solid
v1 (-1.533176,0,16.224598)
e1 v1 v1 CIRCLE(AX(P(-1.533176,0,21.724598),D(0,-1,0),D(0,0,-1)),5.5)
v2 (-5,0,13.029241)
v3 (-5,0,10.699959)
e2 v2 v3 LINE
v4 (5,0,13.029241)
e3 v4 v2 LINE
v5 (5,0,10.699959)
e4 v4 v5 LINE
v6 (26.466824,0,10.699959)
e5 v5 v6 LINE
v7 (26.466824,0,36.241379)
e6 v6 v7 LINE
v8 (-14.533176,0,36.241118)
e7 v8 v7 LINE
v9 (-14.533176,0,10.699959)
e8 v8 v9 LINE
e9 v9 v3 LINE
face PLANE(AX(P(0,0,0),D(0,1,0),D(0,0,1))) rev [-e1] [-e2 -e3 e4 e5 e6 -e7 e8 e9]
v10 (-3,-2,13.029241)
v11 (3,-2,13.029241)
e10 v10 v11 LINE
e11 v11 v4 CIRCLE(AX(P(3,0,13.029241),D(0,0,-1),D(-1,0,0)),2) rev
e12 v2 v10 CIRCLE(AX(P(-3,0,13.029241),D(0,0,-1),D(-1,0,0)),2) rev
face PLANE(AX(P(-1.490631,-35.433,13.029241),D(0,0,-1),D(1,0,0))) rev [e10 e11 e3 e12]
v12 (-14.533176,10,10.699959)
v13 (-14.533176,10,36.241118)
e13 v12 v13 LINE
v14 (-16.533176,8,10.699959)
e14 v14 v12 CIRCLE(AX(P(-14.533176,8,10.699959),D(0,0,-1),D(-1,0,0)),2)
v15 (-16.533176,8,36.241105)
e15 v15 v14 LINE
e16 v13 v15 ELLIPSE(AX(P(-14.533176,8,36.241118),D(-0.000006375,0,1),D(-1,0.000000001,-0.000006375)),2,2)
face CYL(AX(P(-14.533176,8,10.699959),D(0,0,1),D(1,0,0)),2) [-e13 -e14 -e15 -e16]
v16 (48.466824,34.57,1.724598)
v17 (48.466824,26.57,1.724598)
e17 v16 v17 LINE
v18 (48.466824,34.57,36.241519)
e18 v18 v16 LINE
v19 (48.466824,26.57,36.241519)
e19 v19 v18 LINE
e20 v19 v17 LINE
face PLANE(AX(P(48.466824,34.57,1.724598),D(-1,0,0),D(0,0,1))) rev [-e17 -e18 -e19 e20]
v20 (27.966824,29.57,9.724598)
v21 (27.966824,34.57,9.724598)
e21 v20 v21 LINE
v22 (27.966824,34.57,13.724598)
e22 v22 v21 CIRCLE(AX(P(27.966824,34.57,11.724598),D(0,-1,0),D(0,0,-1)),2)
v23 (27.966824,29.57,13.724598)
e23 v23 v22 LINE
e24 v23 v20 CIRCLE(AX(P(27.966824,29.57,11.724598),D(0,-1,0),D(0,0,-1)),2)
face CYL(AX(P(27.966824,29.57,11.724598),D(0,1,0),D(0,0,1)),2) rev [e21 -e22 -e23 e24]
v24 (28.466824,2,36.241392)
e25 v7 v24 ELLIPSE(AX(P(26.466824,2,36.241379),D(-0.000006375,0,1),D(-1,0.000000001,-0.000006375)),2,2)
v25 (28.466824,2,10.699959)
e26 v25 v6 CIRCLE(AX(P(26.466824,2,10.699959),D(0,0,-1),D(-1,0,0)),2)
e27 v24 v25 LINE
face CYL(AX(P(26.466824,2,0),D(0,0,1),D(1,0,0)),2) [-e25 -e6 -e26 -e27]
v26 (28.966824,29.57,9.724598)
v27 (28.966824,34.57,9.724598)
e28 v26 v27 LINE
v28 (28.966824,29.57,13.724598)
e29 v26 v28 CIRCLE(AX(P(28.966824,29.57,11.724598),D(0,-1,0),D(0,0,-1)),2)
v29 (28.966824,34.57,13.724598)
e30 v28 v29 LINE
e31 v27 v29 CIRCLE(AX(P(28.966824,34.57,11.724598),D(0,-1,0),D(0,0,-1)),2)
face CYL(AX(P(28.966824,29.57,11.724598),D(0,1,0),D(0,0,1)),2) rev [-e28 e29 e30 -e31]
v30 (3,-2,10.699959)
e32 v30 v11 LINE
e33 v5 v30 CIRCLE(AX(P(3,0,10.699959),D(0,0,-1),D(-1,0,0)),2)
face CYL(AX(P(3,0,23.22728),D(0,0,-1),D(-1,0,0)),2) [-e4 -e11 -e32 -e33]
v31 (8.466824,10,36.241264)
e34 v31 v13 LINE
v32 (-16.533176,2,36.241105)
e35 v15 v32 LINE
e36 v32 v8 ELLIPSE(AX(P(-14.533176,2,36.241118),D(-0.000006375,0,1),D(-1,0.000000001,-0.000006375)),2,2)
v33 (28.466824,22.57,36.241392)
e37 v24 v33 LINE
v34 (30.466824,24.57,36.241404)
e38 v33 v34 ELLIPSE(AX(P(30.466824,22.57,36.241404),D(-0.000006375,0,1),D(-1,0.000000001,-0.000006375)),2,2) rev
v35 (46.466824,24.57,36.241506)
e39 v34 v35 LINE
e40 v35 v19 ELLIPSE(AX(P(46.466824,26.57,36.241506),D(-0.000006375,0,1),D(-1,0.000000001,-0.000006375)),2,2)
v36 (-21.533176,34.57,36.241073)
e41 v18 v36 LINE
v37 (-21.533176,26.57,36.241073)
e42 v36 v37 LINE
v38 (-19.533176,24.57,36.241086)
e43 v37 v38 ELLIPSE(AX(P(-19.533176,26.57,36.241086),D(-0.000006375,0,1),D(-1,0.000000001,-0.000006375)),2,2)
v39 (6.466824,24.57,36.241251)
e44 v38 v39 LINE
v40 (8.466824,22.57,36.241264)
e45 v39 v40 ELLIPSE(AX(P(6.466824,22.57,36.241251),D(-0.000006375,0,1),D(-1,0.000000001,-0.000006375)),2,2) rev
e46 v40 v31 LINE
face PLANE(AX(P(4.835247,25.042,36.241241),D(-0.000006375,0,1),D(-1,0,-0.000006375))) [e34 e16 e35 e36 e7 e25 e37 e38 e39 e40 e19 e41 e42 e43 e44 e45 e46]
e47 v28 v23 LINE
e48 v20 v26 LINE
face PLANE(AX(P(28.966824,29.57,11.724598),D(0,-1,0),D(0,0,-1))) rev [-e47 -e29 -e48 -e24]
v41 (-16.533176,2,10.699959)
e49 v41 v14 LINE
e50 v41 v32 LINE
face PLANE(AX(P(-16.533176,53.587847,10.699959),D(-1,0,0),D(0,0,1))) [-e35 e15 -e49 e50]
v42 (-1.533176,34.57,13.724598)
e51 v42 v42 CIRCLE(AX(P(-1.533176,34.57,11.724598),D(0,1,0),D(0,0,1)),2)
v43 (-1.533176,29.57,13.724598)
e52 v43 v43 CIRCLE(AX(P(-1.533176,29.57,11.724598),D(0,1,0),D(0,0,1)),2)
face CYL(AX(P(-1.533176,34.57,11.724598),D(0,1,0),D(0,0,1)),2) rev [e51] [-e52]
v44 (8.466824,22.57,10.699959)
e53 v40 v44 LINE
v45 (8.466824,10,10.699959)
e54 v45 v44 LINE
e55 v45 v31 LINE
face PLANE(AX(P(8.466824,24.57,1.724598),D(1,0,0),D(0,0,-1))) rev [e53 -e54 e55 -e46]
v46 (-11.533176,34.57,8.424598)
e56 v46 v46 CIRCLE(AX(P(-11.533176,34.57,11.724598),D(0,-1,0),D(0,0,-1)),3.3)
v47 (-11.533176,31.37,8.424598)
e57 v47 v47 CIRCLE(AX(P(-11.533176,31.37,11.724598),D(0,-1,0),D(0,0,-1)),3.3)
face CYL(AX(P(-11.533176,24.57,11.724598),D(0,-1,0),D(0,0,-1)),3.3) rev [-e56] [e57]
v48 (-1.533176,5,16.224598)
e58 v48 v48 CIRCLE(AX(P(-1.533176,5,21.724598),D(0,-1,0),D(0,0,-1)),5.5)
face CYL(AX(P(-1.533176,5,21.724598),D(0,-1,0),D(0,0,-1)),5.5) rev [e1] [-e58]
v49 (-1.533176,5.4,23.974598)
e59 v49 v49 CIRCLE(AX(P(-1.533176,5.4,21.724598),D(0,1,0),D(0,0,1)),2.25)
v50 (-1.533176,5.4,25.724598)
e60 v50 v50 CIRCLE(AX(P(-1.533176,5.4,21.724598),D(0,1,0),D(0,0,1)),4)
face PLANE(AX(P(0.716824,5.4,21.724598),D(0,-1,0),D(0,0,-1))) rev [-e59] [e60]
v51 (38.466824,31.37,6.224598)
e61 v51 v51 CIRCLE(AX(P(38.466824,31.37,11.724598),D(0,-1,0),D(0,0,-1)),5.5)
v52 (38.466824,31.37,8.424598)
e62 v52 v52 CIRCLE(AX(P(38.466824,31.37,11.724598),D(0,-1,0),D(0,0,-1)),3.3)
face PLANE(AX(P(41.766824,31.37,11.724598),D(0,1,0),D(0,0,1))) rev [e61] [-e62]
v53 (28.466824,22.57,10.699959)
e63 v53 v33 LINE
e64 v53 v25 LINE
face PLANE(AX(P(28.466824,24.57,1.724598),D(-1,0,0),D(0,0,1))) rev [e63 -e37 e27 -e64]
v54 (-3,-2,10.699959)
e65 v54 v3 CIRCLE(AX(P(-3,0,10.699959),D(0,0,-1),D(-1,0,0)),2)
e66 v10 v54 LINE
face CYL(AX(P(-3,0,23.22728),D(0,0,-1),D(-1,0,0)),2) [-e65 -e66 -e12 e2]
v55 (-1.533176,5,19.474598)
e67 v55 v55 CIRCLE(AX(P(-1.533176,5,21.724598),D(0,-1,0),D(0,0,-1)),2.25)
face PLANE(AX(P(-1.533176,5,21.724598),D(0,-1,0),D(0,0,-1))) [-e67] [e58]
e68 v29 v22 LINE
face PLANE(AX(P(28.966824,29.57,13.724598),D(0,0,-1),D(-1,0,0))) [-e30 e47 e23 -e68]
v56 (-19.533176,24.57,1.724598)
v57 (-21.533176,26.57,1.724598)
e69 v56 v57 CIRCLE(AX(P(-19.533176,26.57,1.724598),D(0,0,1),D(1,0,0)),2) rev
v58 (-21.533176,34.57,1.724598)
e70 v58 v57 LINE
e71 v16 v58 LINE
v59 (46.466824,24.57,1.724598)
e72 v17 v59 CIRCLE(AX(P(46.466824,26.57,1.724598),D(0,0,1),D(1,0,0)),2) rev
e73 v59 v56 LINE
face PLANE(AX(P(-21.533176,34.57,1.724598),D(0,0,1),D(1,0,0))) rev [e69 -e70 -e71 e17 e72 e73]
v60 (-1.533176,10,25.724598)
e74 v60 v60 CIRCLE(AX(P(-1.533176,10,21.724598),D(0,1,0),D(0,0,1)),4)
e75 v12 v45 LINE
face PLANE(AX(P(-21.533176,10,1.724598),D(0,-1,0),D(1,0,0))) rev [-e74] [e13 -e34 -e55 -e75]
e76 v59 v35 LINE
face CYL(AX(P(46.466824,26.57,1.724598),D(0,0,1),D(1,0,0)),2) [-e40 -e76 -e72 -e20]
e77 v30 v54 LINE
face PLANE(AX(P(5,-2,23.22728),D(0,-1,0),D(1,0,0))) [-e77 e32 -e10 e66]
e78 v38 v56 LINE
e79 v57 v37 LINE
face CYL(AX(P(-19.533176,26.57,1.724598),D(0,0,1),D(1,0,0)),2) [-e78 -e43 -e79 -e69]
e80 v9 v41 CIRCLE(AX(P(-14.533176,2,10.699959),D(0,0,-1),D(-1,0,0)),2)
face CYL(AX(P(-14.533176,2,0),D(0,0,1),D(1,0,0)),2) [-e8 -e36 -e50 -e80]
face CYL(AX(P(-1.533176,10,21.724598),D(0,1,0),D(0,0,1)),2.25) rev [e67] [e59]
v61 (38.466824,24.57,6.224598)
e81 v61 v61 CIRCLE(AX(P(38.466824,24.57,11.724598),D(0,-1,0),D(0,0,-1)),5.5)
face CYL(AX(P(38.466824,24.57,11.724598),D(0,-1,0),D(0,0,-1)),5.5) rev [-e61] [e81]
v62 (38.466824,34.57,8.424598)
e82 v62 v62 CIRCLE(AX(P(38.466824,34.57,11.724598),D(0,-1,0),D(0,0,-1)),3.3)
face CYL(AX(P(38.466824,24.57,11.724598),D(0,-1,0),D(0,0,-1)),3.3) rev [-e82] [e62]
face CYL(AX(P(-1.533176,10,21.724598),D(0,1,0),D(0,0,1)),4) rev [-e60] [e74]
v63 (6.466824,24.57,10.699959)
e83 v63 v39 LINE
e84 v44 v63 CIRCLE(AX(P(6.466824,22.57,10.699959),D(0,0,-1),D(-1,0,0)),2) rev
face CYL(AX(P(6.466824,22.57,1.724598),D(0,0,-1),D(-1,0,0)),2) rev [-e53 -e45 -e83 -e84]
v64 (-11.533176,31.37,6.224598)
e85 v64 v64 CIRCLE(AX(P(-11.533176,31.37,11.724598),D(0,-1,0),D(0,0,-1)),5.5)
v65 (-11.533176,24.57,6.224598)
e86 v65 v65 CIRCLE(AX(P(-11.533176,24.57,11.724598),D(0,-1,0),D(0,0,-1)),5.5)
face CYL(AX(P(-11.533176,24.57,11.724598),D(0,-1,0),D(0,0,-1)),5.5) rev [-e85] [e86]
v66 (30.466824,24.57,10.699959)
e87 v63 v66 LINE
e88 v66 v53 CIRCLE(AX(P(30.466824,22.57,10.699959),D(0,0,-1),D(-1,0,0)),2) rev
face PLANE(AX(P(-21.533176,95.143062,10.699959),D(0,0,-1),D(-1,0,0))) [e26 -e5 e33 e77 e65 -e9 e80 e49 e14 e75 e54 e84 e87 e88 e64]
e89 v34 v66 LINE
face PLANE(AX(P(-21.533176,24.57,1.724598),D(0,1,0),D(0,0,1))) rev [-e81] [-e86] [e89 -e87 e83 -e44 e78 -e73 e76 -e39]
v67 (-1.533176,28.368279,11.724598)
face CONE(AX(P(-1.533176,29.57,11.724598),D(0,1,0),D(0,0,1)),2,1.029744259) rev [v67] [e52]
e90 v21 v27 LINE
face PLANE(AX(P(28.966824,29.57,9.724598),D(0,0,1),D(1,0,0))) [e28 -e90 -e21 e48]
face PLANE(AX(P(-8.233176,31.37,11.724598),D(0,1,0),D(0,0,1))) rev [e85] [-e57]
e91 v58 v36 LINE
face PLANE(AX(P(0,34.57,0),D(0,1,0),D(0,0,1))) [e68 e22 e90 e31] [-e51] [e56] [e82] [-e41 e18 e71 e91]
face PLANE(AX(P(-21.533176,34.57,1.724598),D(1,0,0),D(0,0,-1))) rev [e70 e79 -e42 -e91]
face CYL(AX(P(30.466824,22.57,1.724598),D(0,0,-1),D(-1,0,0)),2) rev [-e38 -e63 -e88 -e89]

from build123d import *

# Parameters (mm, degrees)
SKETCH_8_W                = 70
SKETCH_8_H                = 30
EXTRUDE_3_DEPTH           = 34.57
SKETCH_9_W                = 30
SKETCH_9_H                = 14.57
SKETCH_9_W_2              = 20
CUT_EXTRUDE_3_DEPTH       = 67.664217758
OTHER_1_OUTLINE_R         = 5.5
OTHER_1_DEPTH             = 5
HOLE_WIZARD_2_D           = 4.5
HOLE_WIZARD_2_DEPTH       = 10
HOLE_WIZARD_2_CBORE_D     = 8
HOLE_WIZARD_2_CBORE_DEPTH = 4.6
BACK_REACH                = 69.458
SKETCH_16_W               = 70
SKETCH_16_H               = 8.975361008
MM_1_D                    = 4
MM_1_DEPTH                = 5
MM_1_TIP                  = 1.201721238
CUT_EXTRUDE_5_DEPTH       = 5
SKETCH_24_W               = 5
SKETCH_24_H               = 21.024638992
SKETCH_24_W_2             = 20
CUT_EXTRUDE_6_DEPTH       = 10
HOLE_WIZARD_3_D           = 6.6
HOLE_WIZARD_3_DEPTH       = 10
HOLE_WIZARD_3_CBORE_D     = 11
HOLE_WIZARD_3_CBORE_DEPTH = 6.8
FILLET_1_R                = 2
SKETCH_29_W               = 10
SKETCH_29_H               = 2
EXTRUDE_5_DEPTH           = 2.329281552
FILLET_3_R                = 2
CUT_EXTRUDE_7_DEPTH       = 0.5
EXTRUDE_START             = 5.016506594
EXTRUDE_6_DEPTH           = 5.016506594


# Read off the part's stored shape, not the designer's step: 孔1
with BuildPart() as part:
    # 草图8 → 凸台-拉伸3 (new body)
    with BuildSketch(Plane(origin=(0, 0, 0), x_dir=(1, 0, 0), z_dir=(0, 1, 0))):
        with Locations((13.466824006, -16.724598186)):
            Rectangle(SKETCH_8_W, SKETCH_8_H)
    extrude(amount=EXTRUDE_3_DEPTH)

    # 草图9 → 切除-拉伸3 (cut, through all)
    with BuildSketch(Plane.XY.offset(31.724598186)):
        with Locations((-6.533175994, 17.285)):
            Rectangle(SKETCH_9_W, SKETCH_9_H)
        with Locations((38.466824006, 17.285)):
            Rectangle(SKETCH_9_W_2, SKETCH_9_H)
    extrude(amount=-CUT_EXTRUDE_3_DEPTH, mode=Mode.SUBTRACT)

    # 孔1 outline → 孔1 (cut)
    with BuildSketch(Plane(origin=(0, 0, 0), x_dir=(1, 0, 0), z_dir=(0, 1, 0))):
        with Locations((-1.533175994, -21.724598186)):
            Circle(OTHER_1_OUTLINE_R)
    extrude(amount=OTHER_1_DEPTH, mode=Mode.SUBTRACT)

    # 打孔尺寸(%根据)内六角圆柱头螺钉的类型2
    with Locations(Plane(origin=(-1.533175994, 10, 21.724598186), x_dir=(1, 0, 0), z_dir=(0, 1, 0))):
        with Locations((0, 0)):
            CounterBoreHole(HOLE_WIZARD_2_D / 2, HOLE_WIZARD_2_CBORE_D / 2, HOLE_WIZARD_2_CBORE_DEPTH, depth=HOLE_WIZARD_2_DEPTH)

    # back: up to this face of the body (flat: up to its plane)
    back_end = Plane(part.part.faces().sort_by_distance((-6.533175994, 24.57, 16.724598186))[0])
    # 草图16 → back (cut, up to the picked face)
    with BuildSketch(Plane(origin=(0, 0, 0), x_dir=(1, 0, 0), z_dir=(0, 1, 0)), mode=Mode.PRIVATE) as back_sk1:
        with Locations((13.466824006, -6.21227869)):
            Rectangle(SKETCH_16_W, SKETCH_16_H)
    back_tool1 = split(extrude(back_sk1.sketch, amount=BACK_REACH, mode=Mode.PRIVATE), bisect_by=back_end, keep=Keep.BOTH, mode=Mode.PRIVATE)
    add(back_tool1.solids().sort_by(Axis((13.466824, 0, 6.212279), (0, 1, 0)))[0], mode=Mode.SUBTRACT)

    # 大小mm 暗销孔1
    with Locations(Plane(origin=(-1.533175994, 34.57, 11.724598186), x_dir=(0, 0, 1), z_dir=(0, 1, 0))):
        with Locations((0, 0)):
            Hole(MM_1_D / 2, depth=MM_1_DEPTH)
            with Locations((0, 0, -(MM_1_DEPTH + MM_1_TIP / 2))):  # 118° drill point
                Cone(0, MM_1_D / 2, MM_1_TIP, mode=Mode.SUBTRACT)

    # 草图23 → 切除-拉伸5 (cut)
    with BuildSketch(Plane.XZ.offset(-34.57)):
        with BuildLine():
            Line((28.966824006, 9.724598186), (27.966824006, 9.724598186))
            ThreePointArc((27.966824006, 9.724598186), (25.966824006, 11.724598186), (27.966824006, 13.724598186))
            Line((27.966824006, 13.724598186), (28.966824006, 13.724598186))
            ThreePointArc((28.966824006, 13.724598186), (30.966824006, 11.724598186), (28.966824006, 9.724598186))
        make_face()
    extrude(amount=CUT_EXTRUDE_5_DEPTH, mode=Mode.SUBTRACT)

    # 草图24 → 切除-拉伸6 (cut)
    with BuildSketch(Plane(origin=(0, 0, 0), x_dir=(1, 0, 0), z_dir=(0, 1, 0))):
        with Locations((-19.033175994, -21.21227869)):
            Rectangle(SKETCH_24_W, SKETCH_24_H)
        with Locations((38.466824006, -21.21227869)):
            Rectangle(SKETCH_24_W_2, SKETCH_24_H)
    extrude(amount=CUT_EXTRUDE_6_DEPTH, mode=Mode.SUBTRACT)

    # 打孔尺寸(%根据)内六角圆柱头螺钉的类型3
    with Locations(Plane(origin=(-11.533175994, 24.57, 11.724598186), x_dir=(0, 0, -1), z_dir=(0, -1, 0))):
        with Locations((0, 0), (0, 50)):
            CounterBoreHole(HOLE_WIZARD_3_D / 2, HOLE_WIZARD_3_CBORE_D / 2, HOLE_WIZARD_3_CBORE_DEPTH, depth=HOLE_WIZARD_3_DEPTH)

    # 圆角1
    fillet_1_edges = [part.edges().sort_by_distance(p)[0] for p in [
        (-16.533175994, 0, 21.21227869),
        (-16.533175994, 10, 21.21227869),
        (28.466824006, 0, 21.21227869),
        (-21.533175994, 24.57, 16.724598186),
        (48.466824006, 24.57, 16.724598186),
        (8.466824006, 24.57, 21.21227869),
        (28.466824006, 24.57, 21.21227869),
    ]]
    fillet(fillet_1_edges, radius=FILLET_1_R)

    # 草图29 → 凸台-拉伸5 (add)
    with BuildSketch(Plane(origin=(0, 0, 10.699959194), x_dir=(-1, 0, 0), z_dir=(0, 0, -1))):
        with Locations((0, -1)):
            Rectangle(SKETCH_29_W, SKETCH_29_H)
    extrude(amount=-EXTRUDE_5_DEPTH)

    # 圆角3
    fillet_3_edges = [part.edges().sort_by_distance(p)[0] for p in [
        (-5, -2, 11.86459997),
        (5, -2, 11.86459997),
    ]]
    fillet(fillet_3_edges, radius=FILLET_3_R - 0.0001)  # a hair under: the kernel refuses the full size

    # 草图30 → 切除-拉伸7 (cut)
    with BuildSketch(Plane.XY.offset(31.724598186)):
        with BuildLine():
            Line((-14.533175994, 0), (26.466824006, 0))
            ThreePointArc((26.466824006, 0), (27.881037569, 0.585786438), (28.466824006, 2))
            Line((28.466824006, 2), (28.466824006, 22.57))
            ThreePointArc((28.466824006, 22.57), (29.052610444, 23.984213562), (30.466824006, 24.57))
            Line((30.466824006, 24.57), (46.466824006, 24.57))
            ThreePointArc((46.466824006, 24.57), (47.881037569, 25.155786438), (48.466824006, 26.57))
            Line((48.466824006, 26.57), (48.466824006, 34.57))
            Line((48.466824006, 34.57), (-21.533175994, 34.57))
            Line((-21.533175994, 34.57), (-21.533175994, 26.57))
            ThreePointArc((-21.533175994, 26.57), (-20.947389556, 25.155786438), (-19.533175994, 24.57))
            Line((-19.533175994, 24.57), (6.466824006, 24.57))
            ThreePointArc((6.466824006, 24.57), (7.881037569, 23.984213562), (8.466824006, 22.57))
            Line((8.466824006, 22.57), (8.466824006, 10))
            Line((8.466824006, 10), (-14.533175994, 10))
            ThreePointArc((-14.533175994, 10), (-15.947389556, 9.414213562), (-16.533175994, 8))
            Line((-16.533175994, 8), (-16.533175994, 2))
            ThreePointArc((-16.533175994, 2), (-15.947389556, 0.585786438), (-14.533175994, 0))
        make_face()
    extrude(amount=-CUT_EXTRUDE_7_DEPTH, mode=Mode.SUBTRACT)

    # 草图31 → 凸台-拉伸6 (add)
    with BuildSketch(Plane.XY.offset(31.224598186).offset(EXTRUDE_START)):
        with BuildLine():
            Line((-14.533175994, 0), (26.466824006, 0))
            ThreePointArc((26.466824006, 0), (27.881037569, 0.585786438), (28.466824006, 2))
            Line((28.466824006, 2), (28.466824006, 22.57))
            ThreePointArc((28.466824006, 22.57), (29.052610444, 23.984213562), (30.466824006, 24.57))
            Line((30.466824006, 24.57), (46.466824006, 24.57))
            ThreePointArc((46.466824006, 24.57), (47.881037569, 25.155786438), (48.466824006, 26.57))
            Line((48.466824006, 26.57), (48.466824006, 34.57))
            Line((48.466824006, 34.57), (-21.533175994, 34.57))
            Line((-21.533175994, 34.57), (-21.533175994, 26.57))
            ThreePointArc((-21.533175994, 26.57), (-20.947389556, 25.155786438), (-19.533175994, 24.57))
            Line((-19.533175994, 24.57), (6.466824006, 24.57))
            ThreePointArc((6.466824006, 24.57), (7.881037569, 23.984213562), (8.466824006, 22.57))
            Line((8.466824006, 22.57), (8.466824006, 10))
            Line((8.466824006, 10), (-14.533175994, 10))
            ThreePointArc((-14.533175994, 10), (-15.947389556, 9.414213562), (-16.533175994, 8))
            Line((-16.533175994, 8), (-16.533175994, 2))
            ThreePointArc((-16.533175994, 2), (-15.947389556, 0.585786438), (-14.533175994, 0))
        make_face()
    extrude(amount=-EXTRUDE_6_DEPTH)


solid = part.part
